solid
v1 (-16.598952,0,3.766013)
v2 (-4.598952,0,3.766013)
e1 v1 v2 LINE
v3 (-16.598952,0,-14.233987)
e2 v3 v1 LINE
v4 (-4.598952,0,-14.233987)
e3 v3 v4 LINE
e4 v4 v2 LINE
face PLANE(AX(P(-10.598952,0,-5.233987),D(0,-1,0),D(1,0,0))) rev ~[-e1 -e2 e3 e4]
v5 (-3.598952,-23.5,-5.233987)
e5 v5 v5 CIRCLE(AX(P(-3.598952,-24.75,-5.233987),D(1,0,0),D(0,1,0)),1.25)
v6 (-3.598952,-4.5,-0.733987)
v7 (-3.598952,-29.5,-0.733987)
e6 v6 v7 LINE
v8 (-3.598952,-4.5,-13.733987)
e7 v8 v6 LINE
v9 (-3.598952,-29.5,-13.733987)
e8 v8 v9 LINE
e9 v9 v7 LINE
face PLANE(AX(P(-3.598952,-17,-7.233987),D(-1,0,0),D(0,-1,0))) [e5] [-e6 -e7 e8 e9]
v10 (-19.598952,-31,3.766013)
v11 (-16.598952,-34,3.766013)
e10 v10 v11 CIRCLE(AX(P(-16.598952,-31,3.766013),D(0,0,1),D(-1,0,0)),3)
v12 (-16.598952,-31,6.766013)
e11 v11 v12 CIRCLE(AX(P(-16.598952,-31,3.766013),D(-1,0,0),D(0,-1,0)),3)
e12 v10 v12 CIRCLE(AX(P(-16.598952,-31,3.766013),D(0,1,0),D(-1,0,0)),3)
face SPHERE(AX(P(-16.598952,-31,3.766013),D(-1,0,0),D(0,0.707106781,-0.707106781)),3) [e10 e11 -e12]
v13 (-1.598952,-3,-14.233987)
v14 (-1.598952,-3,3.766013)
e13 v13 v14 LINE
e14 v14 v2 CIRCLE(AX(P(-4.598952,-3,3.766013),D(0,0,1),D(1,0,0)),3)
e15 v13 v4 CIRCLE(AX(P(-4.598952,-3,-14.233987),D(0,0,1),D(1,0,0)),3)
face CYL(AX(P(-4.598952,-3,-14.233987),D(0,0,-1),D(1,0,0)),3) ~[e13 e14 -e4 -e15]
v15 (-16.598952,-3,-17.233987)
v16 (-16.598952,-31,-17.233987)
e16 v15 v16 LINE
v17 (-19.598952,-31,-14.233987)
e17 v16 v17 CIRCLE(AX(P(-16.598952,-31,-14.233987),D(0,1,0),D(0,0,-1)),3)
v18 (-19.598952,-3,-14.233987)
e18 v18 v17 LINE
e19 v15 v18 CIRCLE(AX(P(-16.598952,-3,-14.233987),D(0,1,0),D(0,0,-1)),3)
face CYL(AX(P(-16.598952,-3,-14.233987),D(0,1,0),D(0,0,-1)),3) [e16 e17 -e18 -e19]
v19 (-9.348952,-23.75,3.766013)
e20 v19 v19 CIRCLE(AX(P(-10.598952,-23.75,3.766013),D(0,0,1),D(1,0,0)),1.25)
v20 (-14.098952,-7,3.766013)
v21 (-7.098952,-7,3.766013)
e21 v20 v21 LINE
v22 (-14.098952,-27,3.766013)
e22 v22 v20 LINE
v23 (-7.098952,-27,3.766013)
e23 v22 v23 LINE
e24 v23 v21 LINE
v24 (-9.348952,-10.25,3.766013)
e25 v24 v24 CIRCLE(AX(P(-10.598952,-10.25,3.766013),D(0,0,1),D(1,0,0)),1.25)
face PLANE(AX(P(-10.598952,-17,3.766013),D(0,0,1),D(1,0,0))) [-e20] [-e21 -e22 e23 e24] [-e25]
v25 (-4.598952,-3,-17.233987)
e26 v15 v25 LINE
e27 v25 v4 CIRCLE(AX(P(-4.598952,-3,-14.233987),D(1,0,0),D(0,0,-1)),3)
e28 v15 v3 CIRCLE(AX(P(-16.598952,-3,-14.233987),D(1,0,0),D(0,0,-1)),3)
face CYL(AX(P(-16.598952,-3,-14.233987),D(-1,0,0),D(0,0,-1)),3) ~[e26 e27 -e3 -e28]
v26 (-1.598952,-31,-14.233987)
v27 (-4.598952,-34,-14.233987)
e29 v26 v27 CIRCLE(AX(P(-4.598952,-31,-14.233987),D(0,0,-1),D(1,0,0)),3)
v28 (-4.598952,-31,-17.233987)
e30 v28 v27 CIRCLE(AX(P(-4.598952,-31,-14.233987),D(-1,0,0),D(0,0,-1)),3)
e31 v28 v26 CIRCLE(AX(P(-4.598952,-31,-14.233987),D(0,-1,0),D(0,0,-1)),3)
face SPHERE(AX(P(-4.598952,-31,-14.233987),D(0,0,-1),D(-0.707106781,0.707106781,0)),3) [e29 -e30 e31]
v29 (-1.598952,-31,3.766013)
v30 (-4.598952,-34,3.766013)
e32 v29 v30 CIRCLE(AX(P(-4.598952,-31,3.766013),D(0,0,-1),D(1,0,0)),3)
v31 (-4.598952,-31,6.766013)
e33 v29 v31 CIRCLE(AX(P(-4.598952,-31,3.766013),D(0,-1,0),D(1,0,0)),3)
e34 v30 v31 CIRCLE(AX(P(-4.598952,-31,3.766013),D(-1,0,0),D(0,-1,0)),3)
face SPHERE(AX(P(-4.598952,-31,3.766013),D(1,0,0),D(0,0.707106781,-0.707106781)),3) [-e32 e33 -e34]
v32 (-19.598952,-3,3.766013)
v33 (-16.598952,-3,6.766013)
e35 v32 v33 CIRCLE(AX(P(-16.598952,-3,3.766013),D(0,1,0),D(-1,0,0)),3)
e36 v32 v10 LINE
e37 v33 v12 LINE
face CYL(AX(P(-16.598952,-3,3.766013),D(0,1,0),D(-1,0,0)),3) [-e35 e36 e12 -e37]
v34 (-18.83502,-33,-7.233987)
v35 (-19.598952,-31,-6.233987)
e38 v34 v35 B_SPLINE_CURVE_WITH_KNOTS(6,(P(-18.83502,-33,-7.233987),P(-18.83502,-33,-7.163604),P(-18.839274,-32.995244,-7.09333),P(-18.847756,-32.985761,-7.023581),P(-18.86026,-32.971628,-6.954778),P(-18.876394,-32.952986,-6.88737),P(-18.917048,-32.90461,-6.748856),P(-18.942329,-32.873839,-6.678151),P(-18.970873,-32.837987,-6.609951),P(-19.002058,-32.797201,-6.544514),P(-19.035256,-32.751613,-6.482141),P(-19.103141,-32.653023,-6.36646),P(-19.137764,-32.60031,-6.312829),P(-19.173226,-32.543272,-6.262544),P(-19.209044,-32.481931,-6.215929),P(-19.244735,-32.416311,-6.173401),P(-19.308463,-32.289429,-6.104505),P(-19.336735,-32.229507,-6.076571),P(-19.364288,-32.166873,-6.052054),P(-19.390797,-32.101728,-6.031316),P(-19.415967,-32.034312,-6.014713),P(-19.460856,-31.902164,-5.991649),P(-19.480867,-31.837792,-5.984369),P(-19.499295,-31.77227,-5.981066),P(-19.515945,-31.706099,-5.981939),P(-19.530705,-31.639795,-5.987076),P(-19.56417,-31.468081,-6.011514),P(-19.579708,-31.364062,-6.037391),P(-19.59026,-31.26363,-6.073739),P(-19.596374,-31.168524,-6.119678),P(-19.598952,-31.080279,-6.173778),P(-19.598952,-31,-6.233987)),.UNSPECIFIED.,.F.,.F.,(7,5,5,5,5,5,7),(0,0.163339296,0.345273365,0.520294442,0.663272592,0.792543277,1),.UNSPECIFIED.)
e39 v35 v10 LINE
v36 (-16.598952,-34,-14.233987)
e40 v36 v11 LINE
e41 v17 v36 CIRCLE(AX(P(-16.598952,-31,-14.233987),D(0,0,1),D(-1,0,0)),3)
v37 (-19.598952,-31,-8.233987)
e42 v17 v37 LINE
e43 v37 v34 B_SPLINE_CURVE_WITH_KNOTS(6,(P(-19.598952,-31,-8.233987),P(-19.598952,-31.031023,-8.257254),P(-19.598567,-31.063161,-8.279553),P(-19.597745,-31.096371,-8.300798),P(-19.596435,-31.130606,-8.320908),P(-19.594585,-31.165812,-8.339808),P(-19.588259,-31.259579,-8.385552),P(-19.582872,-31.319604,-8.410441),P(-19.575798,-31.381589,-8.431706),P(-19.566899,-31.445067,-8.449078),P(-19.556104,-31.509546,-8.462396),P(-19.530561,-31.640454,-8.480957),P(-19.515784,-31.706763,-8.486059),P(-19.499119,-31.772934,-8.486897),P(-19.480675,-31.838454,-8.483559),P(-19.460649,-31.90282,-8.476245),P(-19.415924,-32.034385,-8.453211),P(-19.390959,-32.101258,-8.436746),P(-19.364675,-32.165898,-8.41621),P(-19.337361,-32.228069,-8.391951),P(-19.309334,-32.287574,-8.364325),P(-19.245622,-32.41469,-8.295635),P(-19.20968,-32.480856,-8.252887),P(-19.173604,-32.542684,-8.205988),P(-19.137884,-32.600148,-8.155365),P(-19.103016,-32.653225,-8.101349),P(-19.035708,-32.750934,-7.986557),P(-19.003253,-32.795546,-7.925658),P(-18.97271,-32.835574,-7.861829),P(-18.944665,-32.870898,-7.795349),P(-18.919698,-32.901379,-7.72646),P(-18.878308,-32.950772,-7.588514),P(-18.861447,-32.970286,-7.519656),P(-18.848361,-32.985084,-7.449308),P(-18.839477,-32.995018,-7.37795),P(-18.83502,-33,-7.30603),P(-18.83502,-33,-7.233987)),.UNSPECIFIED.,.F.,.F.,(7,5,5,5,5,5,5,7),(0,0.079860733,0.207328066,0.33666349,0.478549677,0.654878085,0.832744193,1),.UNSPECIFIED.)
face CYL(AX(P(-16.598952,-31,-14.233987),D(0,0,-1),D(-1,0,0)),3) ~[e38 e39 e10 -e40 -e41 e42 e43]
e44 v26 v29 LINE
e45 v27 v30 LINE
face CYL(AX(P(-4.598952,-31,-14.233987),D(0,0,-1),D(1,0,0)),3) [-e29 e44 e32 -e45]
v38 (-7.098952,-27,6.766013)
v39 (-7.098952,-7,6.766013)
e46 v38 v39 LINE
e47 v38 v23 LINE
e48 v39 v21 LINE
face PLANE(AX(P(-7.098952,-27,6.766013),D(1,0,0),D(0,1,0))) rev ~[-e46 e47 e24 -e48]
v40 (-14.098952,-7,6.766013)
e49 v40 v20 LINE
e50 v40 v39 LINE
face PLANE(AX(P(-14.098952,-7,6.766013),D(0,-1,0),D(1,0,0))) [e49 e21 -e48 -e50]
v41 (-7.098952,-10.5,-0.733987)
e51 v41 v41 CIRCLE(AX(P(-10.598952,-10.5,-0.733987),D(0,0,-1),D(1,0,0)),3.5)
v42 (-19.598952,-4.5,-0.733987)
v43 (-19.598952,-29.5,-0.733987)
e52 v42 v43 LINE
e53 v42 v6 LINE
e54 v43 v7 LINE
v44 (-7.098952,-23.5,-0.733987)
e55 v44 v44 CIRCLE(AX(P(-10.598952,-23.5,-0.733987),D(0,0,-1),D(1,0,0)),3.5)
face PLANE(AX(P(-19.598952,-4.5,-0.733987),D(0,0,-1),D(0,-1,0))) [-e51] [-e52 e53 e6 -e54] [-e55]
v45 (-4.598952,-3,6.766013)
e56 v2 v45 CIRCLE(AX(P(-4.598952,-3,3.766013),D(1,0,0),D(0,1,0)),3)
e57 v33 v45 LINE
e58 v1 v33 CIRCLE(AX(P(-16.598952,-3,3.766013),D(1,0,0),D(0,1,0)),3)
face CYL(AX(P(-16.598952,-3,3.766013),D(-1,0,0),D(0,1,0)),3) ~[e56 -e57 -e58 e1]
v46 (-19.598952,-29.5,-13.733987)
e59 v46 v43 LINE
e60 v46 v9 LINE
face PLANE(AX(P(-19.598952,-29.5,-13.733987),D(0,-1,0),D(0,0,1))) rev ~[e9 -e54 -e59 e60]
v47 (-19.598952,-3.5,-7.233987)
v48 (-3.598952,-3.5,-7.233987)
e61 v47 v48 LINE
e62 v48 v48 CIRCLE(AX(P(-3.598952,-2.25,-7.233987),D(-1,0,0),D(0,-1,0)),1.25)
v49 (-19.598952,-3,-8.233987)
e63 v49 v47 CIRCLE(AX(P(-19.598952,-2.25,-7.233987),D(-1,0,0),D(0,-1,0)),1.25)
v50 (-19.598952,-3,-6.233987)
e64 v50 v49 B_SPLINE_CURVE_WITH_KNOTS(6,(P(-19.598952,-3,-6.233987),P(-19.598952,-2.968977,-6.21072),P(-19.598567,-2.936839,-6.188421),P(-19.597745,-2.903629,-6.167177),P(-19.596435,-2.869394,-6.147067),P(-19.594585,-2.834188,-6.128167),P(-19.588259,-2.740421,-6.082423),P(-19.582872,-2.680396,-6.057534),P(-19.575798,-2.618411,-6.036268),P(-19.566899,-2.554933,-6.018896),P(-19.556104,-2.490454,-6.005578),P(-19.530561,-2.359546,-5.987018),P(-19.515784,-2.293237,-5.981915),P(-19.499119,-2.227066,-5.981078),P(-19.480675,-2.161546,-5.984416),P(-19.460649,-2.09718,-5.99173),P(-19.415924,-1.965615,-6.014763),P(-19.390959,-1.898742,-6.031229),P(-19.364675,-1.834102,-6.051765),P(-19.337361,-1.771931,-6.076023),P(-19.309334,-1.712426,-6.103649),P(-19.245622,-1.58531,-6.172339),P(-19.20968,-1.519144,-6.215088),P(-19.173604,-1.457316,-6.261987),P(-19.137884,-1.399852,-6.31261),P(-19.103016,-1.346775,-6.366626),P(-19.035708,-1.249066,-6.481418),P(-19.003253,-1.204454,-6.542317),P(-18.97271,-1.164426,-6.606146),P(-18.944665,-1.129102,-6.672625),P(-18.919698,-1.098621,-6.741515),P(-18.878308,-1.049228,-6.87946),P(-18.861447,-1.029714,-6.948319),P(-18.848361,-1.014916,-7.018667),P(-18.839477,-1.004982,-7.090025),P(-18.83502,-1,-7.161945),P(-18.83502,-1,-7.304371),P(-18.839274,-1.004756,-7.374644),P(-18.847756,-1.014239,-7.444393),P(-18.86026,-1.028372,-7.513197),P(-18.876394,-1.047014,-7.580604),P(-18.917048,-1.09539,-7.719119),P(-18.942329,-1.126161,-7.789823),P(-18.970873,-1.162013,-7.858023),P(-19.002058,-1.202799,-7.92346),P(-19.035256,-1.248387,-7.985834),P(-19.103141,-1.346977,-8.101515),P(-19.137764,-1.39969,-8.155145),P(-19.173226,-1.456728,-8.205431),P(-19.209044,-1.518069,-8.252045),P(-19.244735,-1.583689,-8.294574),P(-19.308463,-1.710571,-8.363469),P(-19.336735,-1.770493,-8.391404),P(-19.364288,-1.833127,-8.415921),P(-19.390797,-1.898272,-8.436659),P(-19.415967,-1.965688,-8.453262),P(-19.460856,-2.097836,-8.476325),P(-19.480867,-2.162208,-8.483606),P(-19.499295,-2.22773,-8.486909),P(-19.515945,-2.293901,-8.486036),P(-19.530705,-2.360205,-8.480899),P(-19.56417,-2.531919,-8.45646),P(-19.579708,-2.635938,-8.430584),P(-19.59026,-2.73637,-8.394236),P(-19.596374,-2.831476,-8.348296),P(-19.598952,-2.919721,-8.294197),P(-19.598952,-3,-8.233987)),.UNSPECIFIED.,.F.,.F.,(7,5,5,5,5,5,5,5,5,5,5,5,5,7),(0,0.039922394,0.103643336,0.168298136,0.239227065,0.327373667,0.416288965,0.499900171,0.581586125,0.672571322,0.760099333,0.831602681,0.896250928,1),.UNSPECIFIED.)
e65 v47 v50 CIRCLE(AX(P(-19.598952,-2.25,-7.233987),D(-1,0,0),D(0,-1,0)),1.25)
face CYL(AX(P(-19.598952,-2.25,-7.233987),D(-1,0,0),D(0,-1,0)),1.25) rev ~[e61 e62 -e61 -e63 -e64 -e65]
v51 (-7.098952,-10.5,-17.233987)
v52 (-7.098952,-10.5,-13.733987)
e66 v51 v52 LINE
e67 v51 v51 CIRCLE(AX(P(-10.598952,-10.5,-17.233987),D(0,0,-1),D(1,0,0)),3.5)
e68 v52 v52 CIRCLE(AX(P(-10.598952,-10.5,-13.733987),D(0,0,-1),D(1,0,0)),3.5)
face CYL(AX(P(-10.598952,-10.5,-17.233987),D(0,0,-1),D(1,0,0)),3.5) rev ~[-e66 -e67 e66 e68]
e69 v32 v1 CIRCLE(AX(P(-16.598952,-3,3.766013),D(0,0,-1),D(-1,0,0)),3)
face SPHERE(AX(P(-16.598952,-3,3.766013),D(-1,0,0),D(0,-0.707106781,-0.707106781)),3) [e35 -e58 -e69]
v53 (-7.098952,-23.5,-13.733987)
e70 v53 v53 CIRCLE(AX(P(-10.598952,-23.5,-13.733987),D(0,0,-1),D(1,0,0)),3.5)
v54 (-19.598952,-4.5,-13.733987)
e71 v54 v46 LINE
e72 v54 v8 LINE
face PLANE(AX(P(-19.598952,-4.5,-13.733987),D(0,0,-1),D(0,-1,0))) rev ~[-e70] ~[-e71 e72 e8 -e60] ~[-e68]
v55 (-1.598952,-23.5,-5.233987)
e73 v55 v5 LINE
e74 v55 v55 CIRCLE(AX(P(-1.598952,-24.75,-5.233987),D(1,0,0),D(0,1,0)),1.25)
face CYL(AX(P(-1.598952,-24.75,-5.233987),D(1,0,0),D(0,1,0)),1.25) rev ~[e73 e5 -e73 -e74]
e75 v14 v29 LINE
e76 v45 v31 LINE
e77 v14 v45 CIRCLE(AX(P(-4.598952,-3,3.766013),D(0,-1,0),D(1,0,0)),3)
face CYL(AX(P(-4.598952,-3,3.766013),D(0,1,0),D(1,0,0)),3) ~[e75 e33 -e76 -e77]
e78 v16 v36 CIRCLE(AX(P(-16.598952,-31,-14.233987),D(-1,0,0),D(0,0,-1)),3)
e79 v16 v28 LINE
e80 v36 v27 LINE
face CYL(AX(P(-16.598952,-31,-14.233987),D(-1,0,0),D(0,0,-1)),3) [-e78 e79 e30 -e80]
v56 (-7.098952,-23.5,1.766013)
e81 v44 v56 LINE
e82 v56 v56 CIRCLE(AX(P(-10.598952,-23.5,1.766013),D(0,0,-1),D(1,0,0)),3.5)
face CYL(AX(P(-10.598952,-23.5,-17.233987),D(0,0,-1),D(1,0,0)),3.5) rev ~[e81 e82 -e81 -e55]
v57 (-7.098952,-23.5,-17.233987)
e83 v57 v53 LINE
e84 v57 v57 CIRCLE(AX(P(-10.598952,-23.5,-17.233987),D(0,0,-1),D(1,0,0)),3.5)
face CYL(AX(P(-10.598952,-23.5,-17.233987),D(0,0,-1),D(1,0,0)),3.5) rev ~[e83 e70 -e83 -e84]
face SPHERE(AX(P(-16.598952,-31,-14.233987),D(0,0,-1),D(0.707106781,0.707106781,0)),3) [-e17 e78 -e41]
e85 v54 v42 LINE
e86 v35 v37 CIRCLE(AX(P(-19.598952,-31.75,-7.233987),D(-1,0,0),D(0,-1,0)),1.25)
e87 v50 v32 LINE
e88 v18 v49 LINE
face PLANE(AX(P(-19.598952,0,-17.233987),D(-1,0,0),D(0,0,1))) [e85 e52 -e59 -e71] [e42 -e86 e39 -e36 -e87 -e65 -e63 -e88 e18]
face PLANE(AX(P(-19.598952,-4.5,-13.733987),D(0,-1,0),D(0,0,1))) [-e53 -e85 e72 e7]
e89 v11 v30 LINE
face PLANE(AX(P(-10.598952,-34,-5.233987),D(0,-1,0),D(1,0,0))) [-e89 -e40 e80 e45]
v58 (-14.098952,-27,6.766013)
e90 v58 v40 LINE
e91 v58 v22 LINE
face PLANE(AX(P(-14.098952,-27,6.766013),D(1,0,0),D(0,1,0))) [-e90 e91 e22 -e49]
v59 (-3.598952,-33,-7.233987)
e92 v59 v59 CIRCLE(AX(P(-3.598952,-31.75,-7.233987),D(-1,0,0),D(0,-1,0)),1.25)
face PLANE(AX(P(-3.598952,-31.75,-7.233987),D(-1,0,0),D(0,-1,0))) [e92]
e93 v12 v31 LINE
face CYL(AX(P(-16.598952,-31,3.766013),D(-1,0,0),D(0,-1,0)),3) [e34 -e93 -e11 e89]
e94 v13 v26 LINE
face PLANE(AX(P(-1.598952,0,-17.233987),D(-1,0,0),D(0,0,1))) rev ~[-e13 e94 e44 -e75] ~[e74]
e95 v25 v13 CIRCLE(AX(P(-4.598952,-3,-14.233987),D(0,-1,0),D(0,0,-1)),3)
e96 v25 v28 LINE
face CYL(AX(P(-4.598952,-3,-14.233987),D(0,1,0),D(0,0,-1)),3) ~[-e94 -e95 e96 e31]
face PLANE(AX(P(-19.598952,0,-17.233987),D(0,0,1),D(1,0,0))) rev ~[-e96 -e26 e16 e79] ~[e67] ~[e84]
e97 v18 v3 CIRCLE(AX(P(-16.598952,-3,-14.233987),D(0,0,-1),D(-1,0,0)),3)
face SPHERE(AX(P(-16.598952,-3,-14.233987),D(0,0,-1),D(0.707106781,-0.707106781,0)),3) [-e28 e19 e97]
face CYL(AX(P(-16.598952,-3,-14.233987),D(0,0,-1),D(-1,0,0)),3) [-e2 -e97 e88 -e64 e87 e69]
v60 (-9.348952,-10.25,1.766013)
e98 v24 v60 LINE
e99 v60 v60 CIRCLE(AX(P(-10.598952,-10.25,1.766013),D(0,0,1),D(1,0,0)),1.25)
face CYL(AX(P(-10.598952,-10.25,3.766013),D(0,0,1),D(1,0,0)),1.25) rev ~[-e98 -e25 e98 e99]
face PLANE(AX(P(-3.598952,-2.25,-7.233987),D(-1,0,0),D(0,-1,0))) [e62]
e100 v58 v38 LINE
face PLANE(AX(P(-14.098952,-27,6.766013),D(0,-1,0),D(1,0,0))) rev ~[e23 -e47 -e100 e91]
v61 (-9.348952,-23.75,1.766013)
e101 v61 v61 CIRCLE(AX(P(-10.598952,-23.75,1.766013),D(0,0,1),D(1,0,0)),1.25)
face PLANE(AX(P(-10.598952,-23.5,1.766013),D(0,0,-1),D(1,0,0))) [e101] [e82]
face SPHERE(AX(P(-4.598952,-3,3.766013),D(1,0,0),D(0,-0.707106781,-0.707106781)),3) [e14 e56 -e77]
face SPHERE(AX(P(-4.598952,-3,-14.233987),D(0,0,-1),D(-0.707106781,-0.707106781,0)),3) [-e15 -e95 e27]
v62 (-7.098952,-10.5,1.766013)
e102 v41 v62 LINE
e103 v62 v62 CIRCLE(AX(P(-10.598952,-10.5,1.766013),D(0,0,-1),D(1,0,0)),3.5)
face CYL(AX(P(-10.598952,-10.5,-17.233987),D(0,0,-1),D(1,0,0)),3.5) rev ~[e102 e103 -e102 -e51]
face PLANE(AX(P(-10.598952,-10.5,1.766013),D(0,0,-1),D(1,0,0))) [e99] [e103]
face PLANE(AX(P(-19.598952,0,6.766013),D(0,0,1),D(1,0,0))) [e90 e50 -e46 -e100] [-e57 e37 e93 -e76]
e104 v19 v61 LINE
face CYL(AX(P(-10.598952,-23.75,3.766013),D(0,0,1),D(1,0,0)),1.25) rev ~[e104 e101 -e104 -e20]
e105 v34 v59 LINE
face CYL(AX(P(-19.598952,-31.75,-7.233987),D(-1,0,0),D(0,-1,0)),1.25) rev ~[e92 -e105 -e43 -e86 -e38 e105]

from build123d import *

# Parameters (mm, degrees)
F0_W         = 18
F0_H         = 24
F1_DEPTH     = 34
F2_W         = 25
F2_H         = 13
F2_R         = 1.25
F3_DEPTH     = 16
F4_W         = 7
F4_H         = 20
F5_DEPTH     = 3
F6_R         = 1.25
F7_DEPTH     = 4
F8_T1_DEPTH  = 28
F8_T3_DEPTH  = 18
F8_T5_DEPTH  = 12
F8_S9_W      = 3
F8_S9_H      = 3
F8_T10_DEPTH = 3
F8_S15_W     = 3
F8_S15_H     = 3
F8_T16_DEPTH = 3
F8_S21_W     = 3
F8_S21_H     = 3
F8_T22_DEPTH = 3
F8_S27_W     = 3
F8_S27_H     = 3
F8_T28_DEPTH = 3
F8_S33_W     = 3
F8_S33_H     = 3
F8_T34_DEPTH = 3
F8_S39_W     = 3
F8_S39_H     = 3
F8_T40_DEPTH = 3
F8_S45_W     = 3
F8_S45_H     = 3
F8_T46_DEPTH = 3
F8_S51_W     = 3
F8_S51_H     = 3
F8_T52_DEPTH = 3
F9_R         = 3.5
F10_DEPTH    = 19
F11_R        = 1.25
F12_DEPTH    = 18.0010001


# Not quite as in the source:
# - a fillet or chamfer that OpenCascade refuses, or shapes differently, is made with other operations: its cross-section is extruded or revolved along the edge and cut away or added


with BuildPart() as f1:
    # F0 (on Front) → F1 (new body)
    with BuildSketch(Plane.XZ):
        with Locations((-10.5989521787, -5.2339873202)):
            Rectangle(F0_W, F0_H)
    extrude(amount=F1_DEPTH)

    # F2 (on face) → F3 (cut)
    with BuildSketch(Plane(origin=(-19.5989521787, 0, 0), x_dir=(0, -1, 0), z_dir=(-1, 0, 0))):
        with Locations((17, -7.2339873202)):
            Rectangle(F2_W, F2_H)
        with Locations((2.25, -7.2339873202)):
            Circle(F2_R)
        with Locations((31.75, -7.2339873202)):
            Circle(F2_R)
    extrude(amount=-F3_DEPTH, mode=Mode.SUBTRACT)

    # F4 (on face) → F5 (cut)
    with BuildSketch(Plane.XY.offset(6.7660126798)):
        with Locations((-10.5989521787, -17)):
            Rectangle(F4_W, F4_H)
    extrude(amount=-F5_DEPTH, mode=Mode.SUBTRACT)

    # F6 (on face) → F7 (cut)
    with BuildSketch(Plane.XY.offset(3.7660126798)):
        with Locations((-10.5989521787, -10.25)):
            Circle(F6_R)
        with Locations((-10.5989521787, -23.75)):
            Circle(F6_R)
    extrude(amount=-F7_DEPTH, mode=Mode.SUBTRACT)

    # F8: fillet of radius 3 on 12 edges, made by hand

    # F8_s2 → F8_t1 (cut)
    with BuildSketch(Plane.XZ.offset(3)):
        with BuildLine():
            ThreePointArc((-19.5989521787, 3.7660126798), (-18.7202725222, 5.8873330233), (-16.5989521787, 6.7660126798))
            Line((-16.5989521787, 6.7660126798), (-19.5989521787, 6.7660126798))
            Line((-19.5989521787, 6.7660126798), (-19.5989521787, 3.7660126798))
        make_face()
        with BuildLine():
            ThreePointArc((-16.5989521787, -17.2339873202), (-18.7202725222, -16.3553076638), (-19.5989521787, -14.2339873202))
            Line((-19.5989521787, -14.2339873202), (-19.5989521787, -17.2339873202))
            Line((-19.5989521787, -17.2339873202), (-16.5989521787, -17.2339873202))
        make_face()
        with BuildLine():
            ThreePointArc((-4.5989521787, -17.2339873202), (-2.4776318351, -16.3553076638), (-1.5989521787, -14.2339873202))
            Line((-1.5989521787, -14.2339873202), (-1.5989521787, -17.2339873202))
            Line((-1.5989521787, -17.2339873202), (-4.5989521787, -17.2339873202))
        make_face()
        with BuildLine():
            ThreePointArc((-1.5989521787, 3.7660126798), (-2.4776318351, 5.8873330233), (-4.5989521787, 6.7660126798))
            Line((-4.5989521787, 6.7660126798), (-1.5989521787, 6.7660126798))
            Line((-1.5989521787, 6.7660126798), (-1.5989521787, 3.7660126798))
        make_face()
    extrude(amount=F8_T1_DEPTH, mode=Mode.SUBTRACT)

    # F8_s4 → F8_t3 (cut)
    with BuildSketch(Plane.XY.offset(-14.2339873202)):
        with BuildLine():
            ThreePointArc((-19.5989521787, -31), (-18.7202725222, -33.1213203436), (-16.5989521787, -34))
            Line((-16.5989521787, -34), (-19.5989521787, -34))
            Line((-19.5989521787, -34), (-19.5989521787, -31))
        make_face()
        with BuildLine():
            ThreePointArc((-1.5989521787, -31), (-2.4776318351, -33.1213203436), (-4.5989521787, -34))
            Line((-4.5989521787, -34), (-1.5989521787, -34))
            Line((-1.5989521787, -34), (-1.5989521787, -31))
        make_face()
        with BuildLine():
            ThreePointArc((-19.5989521787, -3), (-18.7202725222, -0.8786796564), (-16.5989521787, 0))
            Line((-16.5989521787, 0), (-19.5989521787, 0))
            Line((-19.5989521787, 0), (-19.5989521787, -3))
        make_face()
        with BuildLine():
            ThreePointArc((-1.5989521787, -3), (-2.4776318351, -0.8786796564), (-4.5989521787, 0))
            Line((-4.5989521787, 0), (-1.5989521787, 0))
            Line((-1.5989521787, 0), (-1.5989521787, -3))
        make_face()
    extrude(amount=F8_T3_DEPTH, mode=Mode.SUBTRACT)

    # F8_s6 → F8_t5 (cut)
    with BuildSketch(Plane.YZ.offset(-16.5989521787)):
        with BuildLine():
            ThreePointArc((-31, -17.2339873202), (-33.1213203436, -16.3553076638), (-34, -14.2339873202))
            Line((-34, -14.2339873202), (-34, -17.2339873202))
            Line((-34, -17.2339873202), (-31, -17.2339873202))
        make_face()
        with BuildLine():
            ThreePointArc((0, 3.7660126798), (-0.8786796564, 5.8873330233), (-3, 6.7660126798))
            Line((-3, 6.7660126798), (0, 6.7660126798))
            Line((0, 6.7660126798), (0, 3.7660126798))
        make_face()
        with BuildLine():
            ThreePointArc((-34, 3.7660126798), (-33.1213203436, 5.8873330233), (-31, 6.7660126798))
            Line((-31, 6.7660126798), (-34, 6.7660126798))
            Line((-34, 6.7660126798), (-34, 3.7660126798))
        make_face()
        with BuildLine():
            ThreePointArc((-3, -17.2339873202), (-0.8786796564, -16.3553076638), (0, -14.2339873202))
            Line((0, -14.2339873202), (0, -17.2339873202))
            Line((0, -17.2339873202), (-3, -17.2339873202))
        make_face()
    extrude(amount=F8_T5_DEPTH, mode=Mode.SUBTRACT)


with BuildPart() as f8_tool8:
    # F8_s9 → F8_t10 (new body)
    with BuildSketch(Plane.YZ.offset(-16.5989521787)):
        with Locations((-1.5, 5.2660126798)):
            Rectangle(F8_S9_W, F8_S9_H)
    extrude(amount=-F8_T10_DEPTH)

    # F8_s11 → F8_t12 (revolve, cut)
    with BuildSketch(Plane(origin=(-16.5989521787, -3, 3.7660126798), x_dir=(0, -0.7071067812, -0.7071067812), z_dir=(0, 0.7071067812, -0.7071067812))):
        with BuildLine():
            ThreePointArc((0, -3), (3, 0), (0, 3))
            Line((0, 3), (0, -3))
        make_face()
    revolve(axis=Axis((-16.5989521787, -3, 3.7660126798), (-1, 0, 0)), mode=Mode.SUBTRACT)


with BuildPart() as f1_1:
    add(f1.part)

    # F8_t7: cut F8_tool8
    add(f8_tool8.part, mode=Mode.SUBTRACT)


with BuildPart() as f8_tool14:
    # F8_s15 → F8_t16 (new body)
    with BuildSketch(Plane.YZ.offset(-16.5989521787)):
        with Locations((-32.5, 5.2660126798)):
            Rectangle(F8_S15_W, F8_S15_H)
    extrude(amount=-F8_T16_DEPTH)

    # F8_s17 → F8_t18 (revolve, cut)
    with BuildSketch(Plane(origin=(-16.5989521787, -31, 3.7660126798), x_dir=(0, 0.7071067812, -0.7071067812), z_dir=(0, 0.7071067812, 0.7071067812))):
        with BuildLine():
            ThreePointArc((0, -3), (3, 0), (0, 3))
            Line((0, 3), (0, -3))
        make_face()
    revolve(axis=Axis((-16.5989521787, -31, 3.7660126798), (-1, 0, 0)), mode=Mode.SUBTRACT)


with BuildPart() as f1_2:
    add(f1_1.part)

    # F8_t13: cut F8_tool14
    add(f8_tool14.part, mode=Mode.SUBTRACT)


with BuildPart() as f8_tool20:
    # F8_s21 → F8_t22 (new body)
    with BuildSketch(Plane.XY.offset(-14.2339873202)):
        with Locations((-18.0989521787, -32.5)):
            Rectangle(F8_S21_W, F8_S21_H)
    extrude(amount=-F8_T22_DEPTH)

    # F8_s23 → F8_t24 (revolve, cut)
    with BuildSketch(Plane(origin=(-16.5989521787, -31, -14.2339873202), x_dir=(0.7071067812, 0.7071067812, 0), z_dir=(-0.7071067812, 0.7071067812, 0))):
        with BuildLine():
            ThreePointArc((0, -3), (3, 0), (0, 3))
            Line((0, 3), (0, -3))
        make_face()
    revolve(axis=Axis((-16.5989521787, -31, -14.2339873202), (0, 0, -1)), mode=Mode.SUBTRACT)


with BuildPart() as f1_3:
    add(f1_2.part)

    # F8_t19: cut F8_tool20
    add(f8_tool20.part, mode=Mode.SUBTRACT)


with BuildPart() as f8_tool26:
    # F8_s27 → F8_t28 (new body)
    with BuildSketch(Plane.XY.offset(-14.2339873202)):
        with Locations((-3.0989521787, -32.5)):
            Rectangle(F8_S27_W, F8_S27_H)
    extrude(amount=-F8_T28_DEPTH)

    # F8_s29 → F8_t30 (revolve, cut)
    with BuildSketch(Plane(origin=(-4.5989521787, -31, -14.2339873202), x_dir=(-0.7071067812, 0.7071067812, 0), z_dir=(-0.7071067812, -0.7071067812, 0))):
        with BuildLine():
            ThreePointArc((0, -3), (3, 0), (0, 3))
            Line((0, 3), (0, -3))
        make_face()
    revolve(axis=Axis((-4.5989521787, -31, -14.2339873202), (0, 0, -1)), mode=Mode.SUBTRACT)


with BuildPart() as f1_4:
    add(f1_3.part)

    # F8_t25: cut F8_tool26
    add(f8_tool26.part, mode=Mode.SUBTRACT)


with BuildPart() as f8_tool32:
    # F8_s33 → F8_t34 (new body)
    with BuildSketch(Plane.YZ.offset(-4.5989521787)):
        with Locations((-32.5, 5.2660126798)):
            Rectangle(F8_S33_W, F8_S33_H)
    extrude(amount=F8_T34_DEPTH)

    # F8_s35 → F8_t36 (revolve, cut)
    with BuildSketch(Plane(origin=(-4.5989521787, -31, 3.7660126798), x_dir=(0, 0.7071067812, -0.7071067812), z_dir=(0, -0.7071067812, -0.7071067812))):
        with BuildLine():
            ThreePointArc((0, -3), (3, 0), (0, 3))
            Line((0, 3), (0, -3))
        make_face()
    revolve(axis=Axis((-4.5989521787, -31, 3.7660126798), (1, 0, 0)), mode=Mode.SUBTRACT)


with BuildPart() as f1_5:
    add(f1_4.part)

    # F8_t31: cut F8_tool32
    add(f8_tool32.part, mode=Mode.SUBTRACT)


with BuildPart() as f8_tool38:
    # F8_s39 → F8_t40 (new body)
    with BuildSketch(Plane.XY.offset(-14.2339873202)):
        with Locations((-18.0989521787, -1.5)):
            Rectangle(F8_S39_W, F8_S39_H)
    extrude(amount=-F8_T40_DEPTH)

    # F8_s41 → F8_t42 (revolve, cut)
    with BuildSketch(Plane(origin=(-16.5989521787, -3, -14.2339873202), x_dir=(0.7071067812, -0.7071067812, 0), z_dir=(0.7071067812, 0.7071067812, 0))):
        with BuildLine():
            ThreePointArc((0, -3), (3, 0), (0, 3))
            Line((0, 3), (0, -3))
        make_face()
    revolve(axis=Axis((-16.5989521787, -3, -14.2339873202), (0, 0, -1)), mode=Mode.SUBTRACT)


with BuildPart() as f1_6:
    add(f1_5.part)

    # F8_t37: cut F8_tool38
    add(f8_tool38.part, mode=Mode.SUBTRACT)


with BuildPart() as f8_tool44:
    # F8_s45 → F8_t46 (new body)
    with BuildSketch(Plane.XY.offset(-14.2339873202)):
        with Locations((-3.0989521787, -1.5)):
            Rectangle(F8_S45_W, F8_S45_H)
    extrude(amount=-F8_T46_DEPTH)

    # F8_s47 → F8_t48 (revolve, cut)
    with BuildSketch(Plane(origin=(-4.5989521787, -3, -14.2339873202), x_dir=(-0.7071067812, -0.7071067812, 0), z_dir=(0.7071067812, -0.7071067812, 0))):
        with BuildLine():
            ThreePointArc((0, -3), (3, 0), (0, 3))
            Line((0, 3), (0, -3))
        make_face()
    revolve(axis=Axis((-4.5989521787, -3, -14.2339873202), (0, 0, -1)), mode=Mode.SUBTRACT)


with BuildPart() as f1_7:
    add(f1_6.part)

    # F8_t43: cut F8_tool44
    add(f8_tool44.part, mode=Mode.SUBTRACT)


with BuildPart() as f8_tool50:
    # F8_s51 → F8_t52 (new body)
    with BuildSketch(Plane.YZ.offset(-4.5989521787)):
        with Locations((-1.5, 5.2660126798)):
            Rectangle(F8_S51_W, F8_S51_H)
    extrude(amount=F8_T52_DEPTH)

    # F8_s53 → F8_t54 (revolve, cut)
    with BuildSketch(Plane(origin=(-4.5989521787, -3, 3.7660126798), x_dir=(0, -0.7071067812, -0.7071067812), z_dir=(0, -0.7071067812, 0.7071067812))):
        with BuildLine():
            ThreePointArc((0, -3), (3, 0), (0, 3))
            Line((0, 3), (0, -3))
        make_face()
    revolve(axis=Axis((-4.5989521787, -3, 3.7660126798), (1, 0, 0)), mode=Mode.SUBTRACT)


with BuildPart() as f1_8:
    add(f1_7.part)

    # F8_t49: cut F8_tool50
    add(f8_tool50.part, mode=Mode.SUBTRACT)

    # F9 (on face) → F10 (cut)
    with BuildSketch(Plane(origin=(0, 0, -17.2339873202), x_dir=(1, 0, 0), z_dir=(0, 0, -1))):
        with Locations((-10.5989521787, 10.5)):
            Circle(F9_R)
        with Locations((-10.5989521787, 23.5)):
            Circle(F9_R)
    extrude(amount=-F10_DEPTH, mode=Mode.SUBTRACT)

    # F11 (on face) → F12 (cut, through all)
    with BuildSketch(Plane.YZ.offset(-1.5989521787)):
        with Locations((-24.75, -5.2339873202)):
            Circle(F11_R)
    extrude(amount=-F12_DEPTH, mode=Mode.SUBTRACT)


solid = f1_8.part
